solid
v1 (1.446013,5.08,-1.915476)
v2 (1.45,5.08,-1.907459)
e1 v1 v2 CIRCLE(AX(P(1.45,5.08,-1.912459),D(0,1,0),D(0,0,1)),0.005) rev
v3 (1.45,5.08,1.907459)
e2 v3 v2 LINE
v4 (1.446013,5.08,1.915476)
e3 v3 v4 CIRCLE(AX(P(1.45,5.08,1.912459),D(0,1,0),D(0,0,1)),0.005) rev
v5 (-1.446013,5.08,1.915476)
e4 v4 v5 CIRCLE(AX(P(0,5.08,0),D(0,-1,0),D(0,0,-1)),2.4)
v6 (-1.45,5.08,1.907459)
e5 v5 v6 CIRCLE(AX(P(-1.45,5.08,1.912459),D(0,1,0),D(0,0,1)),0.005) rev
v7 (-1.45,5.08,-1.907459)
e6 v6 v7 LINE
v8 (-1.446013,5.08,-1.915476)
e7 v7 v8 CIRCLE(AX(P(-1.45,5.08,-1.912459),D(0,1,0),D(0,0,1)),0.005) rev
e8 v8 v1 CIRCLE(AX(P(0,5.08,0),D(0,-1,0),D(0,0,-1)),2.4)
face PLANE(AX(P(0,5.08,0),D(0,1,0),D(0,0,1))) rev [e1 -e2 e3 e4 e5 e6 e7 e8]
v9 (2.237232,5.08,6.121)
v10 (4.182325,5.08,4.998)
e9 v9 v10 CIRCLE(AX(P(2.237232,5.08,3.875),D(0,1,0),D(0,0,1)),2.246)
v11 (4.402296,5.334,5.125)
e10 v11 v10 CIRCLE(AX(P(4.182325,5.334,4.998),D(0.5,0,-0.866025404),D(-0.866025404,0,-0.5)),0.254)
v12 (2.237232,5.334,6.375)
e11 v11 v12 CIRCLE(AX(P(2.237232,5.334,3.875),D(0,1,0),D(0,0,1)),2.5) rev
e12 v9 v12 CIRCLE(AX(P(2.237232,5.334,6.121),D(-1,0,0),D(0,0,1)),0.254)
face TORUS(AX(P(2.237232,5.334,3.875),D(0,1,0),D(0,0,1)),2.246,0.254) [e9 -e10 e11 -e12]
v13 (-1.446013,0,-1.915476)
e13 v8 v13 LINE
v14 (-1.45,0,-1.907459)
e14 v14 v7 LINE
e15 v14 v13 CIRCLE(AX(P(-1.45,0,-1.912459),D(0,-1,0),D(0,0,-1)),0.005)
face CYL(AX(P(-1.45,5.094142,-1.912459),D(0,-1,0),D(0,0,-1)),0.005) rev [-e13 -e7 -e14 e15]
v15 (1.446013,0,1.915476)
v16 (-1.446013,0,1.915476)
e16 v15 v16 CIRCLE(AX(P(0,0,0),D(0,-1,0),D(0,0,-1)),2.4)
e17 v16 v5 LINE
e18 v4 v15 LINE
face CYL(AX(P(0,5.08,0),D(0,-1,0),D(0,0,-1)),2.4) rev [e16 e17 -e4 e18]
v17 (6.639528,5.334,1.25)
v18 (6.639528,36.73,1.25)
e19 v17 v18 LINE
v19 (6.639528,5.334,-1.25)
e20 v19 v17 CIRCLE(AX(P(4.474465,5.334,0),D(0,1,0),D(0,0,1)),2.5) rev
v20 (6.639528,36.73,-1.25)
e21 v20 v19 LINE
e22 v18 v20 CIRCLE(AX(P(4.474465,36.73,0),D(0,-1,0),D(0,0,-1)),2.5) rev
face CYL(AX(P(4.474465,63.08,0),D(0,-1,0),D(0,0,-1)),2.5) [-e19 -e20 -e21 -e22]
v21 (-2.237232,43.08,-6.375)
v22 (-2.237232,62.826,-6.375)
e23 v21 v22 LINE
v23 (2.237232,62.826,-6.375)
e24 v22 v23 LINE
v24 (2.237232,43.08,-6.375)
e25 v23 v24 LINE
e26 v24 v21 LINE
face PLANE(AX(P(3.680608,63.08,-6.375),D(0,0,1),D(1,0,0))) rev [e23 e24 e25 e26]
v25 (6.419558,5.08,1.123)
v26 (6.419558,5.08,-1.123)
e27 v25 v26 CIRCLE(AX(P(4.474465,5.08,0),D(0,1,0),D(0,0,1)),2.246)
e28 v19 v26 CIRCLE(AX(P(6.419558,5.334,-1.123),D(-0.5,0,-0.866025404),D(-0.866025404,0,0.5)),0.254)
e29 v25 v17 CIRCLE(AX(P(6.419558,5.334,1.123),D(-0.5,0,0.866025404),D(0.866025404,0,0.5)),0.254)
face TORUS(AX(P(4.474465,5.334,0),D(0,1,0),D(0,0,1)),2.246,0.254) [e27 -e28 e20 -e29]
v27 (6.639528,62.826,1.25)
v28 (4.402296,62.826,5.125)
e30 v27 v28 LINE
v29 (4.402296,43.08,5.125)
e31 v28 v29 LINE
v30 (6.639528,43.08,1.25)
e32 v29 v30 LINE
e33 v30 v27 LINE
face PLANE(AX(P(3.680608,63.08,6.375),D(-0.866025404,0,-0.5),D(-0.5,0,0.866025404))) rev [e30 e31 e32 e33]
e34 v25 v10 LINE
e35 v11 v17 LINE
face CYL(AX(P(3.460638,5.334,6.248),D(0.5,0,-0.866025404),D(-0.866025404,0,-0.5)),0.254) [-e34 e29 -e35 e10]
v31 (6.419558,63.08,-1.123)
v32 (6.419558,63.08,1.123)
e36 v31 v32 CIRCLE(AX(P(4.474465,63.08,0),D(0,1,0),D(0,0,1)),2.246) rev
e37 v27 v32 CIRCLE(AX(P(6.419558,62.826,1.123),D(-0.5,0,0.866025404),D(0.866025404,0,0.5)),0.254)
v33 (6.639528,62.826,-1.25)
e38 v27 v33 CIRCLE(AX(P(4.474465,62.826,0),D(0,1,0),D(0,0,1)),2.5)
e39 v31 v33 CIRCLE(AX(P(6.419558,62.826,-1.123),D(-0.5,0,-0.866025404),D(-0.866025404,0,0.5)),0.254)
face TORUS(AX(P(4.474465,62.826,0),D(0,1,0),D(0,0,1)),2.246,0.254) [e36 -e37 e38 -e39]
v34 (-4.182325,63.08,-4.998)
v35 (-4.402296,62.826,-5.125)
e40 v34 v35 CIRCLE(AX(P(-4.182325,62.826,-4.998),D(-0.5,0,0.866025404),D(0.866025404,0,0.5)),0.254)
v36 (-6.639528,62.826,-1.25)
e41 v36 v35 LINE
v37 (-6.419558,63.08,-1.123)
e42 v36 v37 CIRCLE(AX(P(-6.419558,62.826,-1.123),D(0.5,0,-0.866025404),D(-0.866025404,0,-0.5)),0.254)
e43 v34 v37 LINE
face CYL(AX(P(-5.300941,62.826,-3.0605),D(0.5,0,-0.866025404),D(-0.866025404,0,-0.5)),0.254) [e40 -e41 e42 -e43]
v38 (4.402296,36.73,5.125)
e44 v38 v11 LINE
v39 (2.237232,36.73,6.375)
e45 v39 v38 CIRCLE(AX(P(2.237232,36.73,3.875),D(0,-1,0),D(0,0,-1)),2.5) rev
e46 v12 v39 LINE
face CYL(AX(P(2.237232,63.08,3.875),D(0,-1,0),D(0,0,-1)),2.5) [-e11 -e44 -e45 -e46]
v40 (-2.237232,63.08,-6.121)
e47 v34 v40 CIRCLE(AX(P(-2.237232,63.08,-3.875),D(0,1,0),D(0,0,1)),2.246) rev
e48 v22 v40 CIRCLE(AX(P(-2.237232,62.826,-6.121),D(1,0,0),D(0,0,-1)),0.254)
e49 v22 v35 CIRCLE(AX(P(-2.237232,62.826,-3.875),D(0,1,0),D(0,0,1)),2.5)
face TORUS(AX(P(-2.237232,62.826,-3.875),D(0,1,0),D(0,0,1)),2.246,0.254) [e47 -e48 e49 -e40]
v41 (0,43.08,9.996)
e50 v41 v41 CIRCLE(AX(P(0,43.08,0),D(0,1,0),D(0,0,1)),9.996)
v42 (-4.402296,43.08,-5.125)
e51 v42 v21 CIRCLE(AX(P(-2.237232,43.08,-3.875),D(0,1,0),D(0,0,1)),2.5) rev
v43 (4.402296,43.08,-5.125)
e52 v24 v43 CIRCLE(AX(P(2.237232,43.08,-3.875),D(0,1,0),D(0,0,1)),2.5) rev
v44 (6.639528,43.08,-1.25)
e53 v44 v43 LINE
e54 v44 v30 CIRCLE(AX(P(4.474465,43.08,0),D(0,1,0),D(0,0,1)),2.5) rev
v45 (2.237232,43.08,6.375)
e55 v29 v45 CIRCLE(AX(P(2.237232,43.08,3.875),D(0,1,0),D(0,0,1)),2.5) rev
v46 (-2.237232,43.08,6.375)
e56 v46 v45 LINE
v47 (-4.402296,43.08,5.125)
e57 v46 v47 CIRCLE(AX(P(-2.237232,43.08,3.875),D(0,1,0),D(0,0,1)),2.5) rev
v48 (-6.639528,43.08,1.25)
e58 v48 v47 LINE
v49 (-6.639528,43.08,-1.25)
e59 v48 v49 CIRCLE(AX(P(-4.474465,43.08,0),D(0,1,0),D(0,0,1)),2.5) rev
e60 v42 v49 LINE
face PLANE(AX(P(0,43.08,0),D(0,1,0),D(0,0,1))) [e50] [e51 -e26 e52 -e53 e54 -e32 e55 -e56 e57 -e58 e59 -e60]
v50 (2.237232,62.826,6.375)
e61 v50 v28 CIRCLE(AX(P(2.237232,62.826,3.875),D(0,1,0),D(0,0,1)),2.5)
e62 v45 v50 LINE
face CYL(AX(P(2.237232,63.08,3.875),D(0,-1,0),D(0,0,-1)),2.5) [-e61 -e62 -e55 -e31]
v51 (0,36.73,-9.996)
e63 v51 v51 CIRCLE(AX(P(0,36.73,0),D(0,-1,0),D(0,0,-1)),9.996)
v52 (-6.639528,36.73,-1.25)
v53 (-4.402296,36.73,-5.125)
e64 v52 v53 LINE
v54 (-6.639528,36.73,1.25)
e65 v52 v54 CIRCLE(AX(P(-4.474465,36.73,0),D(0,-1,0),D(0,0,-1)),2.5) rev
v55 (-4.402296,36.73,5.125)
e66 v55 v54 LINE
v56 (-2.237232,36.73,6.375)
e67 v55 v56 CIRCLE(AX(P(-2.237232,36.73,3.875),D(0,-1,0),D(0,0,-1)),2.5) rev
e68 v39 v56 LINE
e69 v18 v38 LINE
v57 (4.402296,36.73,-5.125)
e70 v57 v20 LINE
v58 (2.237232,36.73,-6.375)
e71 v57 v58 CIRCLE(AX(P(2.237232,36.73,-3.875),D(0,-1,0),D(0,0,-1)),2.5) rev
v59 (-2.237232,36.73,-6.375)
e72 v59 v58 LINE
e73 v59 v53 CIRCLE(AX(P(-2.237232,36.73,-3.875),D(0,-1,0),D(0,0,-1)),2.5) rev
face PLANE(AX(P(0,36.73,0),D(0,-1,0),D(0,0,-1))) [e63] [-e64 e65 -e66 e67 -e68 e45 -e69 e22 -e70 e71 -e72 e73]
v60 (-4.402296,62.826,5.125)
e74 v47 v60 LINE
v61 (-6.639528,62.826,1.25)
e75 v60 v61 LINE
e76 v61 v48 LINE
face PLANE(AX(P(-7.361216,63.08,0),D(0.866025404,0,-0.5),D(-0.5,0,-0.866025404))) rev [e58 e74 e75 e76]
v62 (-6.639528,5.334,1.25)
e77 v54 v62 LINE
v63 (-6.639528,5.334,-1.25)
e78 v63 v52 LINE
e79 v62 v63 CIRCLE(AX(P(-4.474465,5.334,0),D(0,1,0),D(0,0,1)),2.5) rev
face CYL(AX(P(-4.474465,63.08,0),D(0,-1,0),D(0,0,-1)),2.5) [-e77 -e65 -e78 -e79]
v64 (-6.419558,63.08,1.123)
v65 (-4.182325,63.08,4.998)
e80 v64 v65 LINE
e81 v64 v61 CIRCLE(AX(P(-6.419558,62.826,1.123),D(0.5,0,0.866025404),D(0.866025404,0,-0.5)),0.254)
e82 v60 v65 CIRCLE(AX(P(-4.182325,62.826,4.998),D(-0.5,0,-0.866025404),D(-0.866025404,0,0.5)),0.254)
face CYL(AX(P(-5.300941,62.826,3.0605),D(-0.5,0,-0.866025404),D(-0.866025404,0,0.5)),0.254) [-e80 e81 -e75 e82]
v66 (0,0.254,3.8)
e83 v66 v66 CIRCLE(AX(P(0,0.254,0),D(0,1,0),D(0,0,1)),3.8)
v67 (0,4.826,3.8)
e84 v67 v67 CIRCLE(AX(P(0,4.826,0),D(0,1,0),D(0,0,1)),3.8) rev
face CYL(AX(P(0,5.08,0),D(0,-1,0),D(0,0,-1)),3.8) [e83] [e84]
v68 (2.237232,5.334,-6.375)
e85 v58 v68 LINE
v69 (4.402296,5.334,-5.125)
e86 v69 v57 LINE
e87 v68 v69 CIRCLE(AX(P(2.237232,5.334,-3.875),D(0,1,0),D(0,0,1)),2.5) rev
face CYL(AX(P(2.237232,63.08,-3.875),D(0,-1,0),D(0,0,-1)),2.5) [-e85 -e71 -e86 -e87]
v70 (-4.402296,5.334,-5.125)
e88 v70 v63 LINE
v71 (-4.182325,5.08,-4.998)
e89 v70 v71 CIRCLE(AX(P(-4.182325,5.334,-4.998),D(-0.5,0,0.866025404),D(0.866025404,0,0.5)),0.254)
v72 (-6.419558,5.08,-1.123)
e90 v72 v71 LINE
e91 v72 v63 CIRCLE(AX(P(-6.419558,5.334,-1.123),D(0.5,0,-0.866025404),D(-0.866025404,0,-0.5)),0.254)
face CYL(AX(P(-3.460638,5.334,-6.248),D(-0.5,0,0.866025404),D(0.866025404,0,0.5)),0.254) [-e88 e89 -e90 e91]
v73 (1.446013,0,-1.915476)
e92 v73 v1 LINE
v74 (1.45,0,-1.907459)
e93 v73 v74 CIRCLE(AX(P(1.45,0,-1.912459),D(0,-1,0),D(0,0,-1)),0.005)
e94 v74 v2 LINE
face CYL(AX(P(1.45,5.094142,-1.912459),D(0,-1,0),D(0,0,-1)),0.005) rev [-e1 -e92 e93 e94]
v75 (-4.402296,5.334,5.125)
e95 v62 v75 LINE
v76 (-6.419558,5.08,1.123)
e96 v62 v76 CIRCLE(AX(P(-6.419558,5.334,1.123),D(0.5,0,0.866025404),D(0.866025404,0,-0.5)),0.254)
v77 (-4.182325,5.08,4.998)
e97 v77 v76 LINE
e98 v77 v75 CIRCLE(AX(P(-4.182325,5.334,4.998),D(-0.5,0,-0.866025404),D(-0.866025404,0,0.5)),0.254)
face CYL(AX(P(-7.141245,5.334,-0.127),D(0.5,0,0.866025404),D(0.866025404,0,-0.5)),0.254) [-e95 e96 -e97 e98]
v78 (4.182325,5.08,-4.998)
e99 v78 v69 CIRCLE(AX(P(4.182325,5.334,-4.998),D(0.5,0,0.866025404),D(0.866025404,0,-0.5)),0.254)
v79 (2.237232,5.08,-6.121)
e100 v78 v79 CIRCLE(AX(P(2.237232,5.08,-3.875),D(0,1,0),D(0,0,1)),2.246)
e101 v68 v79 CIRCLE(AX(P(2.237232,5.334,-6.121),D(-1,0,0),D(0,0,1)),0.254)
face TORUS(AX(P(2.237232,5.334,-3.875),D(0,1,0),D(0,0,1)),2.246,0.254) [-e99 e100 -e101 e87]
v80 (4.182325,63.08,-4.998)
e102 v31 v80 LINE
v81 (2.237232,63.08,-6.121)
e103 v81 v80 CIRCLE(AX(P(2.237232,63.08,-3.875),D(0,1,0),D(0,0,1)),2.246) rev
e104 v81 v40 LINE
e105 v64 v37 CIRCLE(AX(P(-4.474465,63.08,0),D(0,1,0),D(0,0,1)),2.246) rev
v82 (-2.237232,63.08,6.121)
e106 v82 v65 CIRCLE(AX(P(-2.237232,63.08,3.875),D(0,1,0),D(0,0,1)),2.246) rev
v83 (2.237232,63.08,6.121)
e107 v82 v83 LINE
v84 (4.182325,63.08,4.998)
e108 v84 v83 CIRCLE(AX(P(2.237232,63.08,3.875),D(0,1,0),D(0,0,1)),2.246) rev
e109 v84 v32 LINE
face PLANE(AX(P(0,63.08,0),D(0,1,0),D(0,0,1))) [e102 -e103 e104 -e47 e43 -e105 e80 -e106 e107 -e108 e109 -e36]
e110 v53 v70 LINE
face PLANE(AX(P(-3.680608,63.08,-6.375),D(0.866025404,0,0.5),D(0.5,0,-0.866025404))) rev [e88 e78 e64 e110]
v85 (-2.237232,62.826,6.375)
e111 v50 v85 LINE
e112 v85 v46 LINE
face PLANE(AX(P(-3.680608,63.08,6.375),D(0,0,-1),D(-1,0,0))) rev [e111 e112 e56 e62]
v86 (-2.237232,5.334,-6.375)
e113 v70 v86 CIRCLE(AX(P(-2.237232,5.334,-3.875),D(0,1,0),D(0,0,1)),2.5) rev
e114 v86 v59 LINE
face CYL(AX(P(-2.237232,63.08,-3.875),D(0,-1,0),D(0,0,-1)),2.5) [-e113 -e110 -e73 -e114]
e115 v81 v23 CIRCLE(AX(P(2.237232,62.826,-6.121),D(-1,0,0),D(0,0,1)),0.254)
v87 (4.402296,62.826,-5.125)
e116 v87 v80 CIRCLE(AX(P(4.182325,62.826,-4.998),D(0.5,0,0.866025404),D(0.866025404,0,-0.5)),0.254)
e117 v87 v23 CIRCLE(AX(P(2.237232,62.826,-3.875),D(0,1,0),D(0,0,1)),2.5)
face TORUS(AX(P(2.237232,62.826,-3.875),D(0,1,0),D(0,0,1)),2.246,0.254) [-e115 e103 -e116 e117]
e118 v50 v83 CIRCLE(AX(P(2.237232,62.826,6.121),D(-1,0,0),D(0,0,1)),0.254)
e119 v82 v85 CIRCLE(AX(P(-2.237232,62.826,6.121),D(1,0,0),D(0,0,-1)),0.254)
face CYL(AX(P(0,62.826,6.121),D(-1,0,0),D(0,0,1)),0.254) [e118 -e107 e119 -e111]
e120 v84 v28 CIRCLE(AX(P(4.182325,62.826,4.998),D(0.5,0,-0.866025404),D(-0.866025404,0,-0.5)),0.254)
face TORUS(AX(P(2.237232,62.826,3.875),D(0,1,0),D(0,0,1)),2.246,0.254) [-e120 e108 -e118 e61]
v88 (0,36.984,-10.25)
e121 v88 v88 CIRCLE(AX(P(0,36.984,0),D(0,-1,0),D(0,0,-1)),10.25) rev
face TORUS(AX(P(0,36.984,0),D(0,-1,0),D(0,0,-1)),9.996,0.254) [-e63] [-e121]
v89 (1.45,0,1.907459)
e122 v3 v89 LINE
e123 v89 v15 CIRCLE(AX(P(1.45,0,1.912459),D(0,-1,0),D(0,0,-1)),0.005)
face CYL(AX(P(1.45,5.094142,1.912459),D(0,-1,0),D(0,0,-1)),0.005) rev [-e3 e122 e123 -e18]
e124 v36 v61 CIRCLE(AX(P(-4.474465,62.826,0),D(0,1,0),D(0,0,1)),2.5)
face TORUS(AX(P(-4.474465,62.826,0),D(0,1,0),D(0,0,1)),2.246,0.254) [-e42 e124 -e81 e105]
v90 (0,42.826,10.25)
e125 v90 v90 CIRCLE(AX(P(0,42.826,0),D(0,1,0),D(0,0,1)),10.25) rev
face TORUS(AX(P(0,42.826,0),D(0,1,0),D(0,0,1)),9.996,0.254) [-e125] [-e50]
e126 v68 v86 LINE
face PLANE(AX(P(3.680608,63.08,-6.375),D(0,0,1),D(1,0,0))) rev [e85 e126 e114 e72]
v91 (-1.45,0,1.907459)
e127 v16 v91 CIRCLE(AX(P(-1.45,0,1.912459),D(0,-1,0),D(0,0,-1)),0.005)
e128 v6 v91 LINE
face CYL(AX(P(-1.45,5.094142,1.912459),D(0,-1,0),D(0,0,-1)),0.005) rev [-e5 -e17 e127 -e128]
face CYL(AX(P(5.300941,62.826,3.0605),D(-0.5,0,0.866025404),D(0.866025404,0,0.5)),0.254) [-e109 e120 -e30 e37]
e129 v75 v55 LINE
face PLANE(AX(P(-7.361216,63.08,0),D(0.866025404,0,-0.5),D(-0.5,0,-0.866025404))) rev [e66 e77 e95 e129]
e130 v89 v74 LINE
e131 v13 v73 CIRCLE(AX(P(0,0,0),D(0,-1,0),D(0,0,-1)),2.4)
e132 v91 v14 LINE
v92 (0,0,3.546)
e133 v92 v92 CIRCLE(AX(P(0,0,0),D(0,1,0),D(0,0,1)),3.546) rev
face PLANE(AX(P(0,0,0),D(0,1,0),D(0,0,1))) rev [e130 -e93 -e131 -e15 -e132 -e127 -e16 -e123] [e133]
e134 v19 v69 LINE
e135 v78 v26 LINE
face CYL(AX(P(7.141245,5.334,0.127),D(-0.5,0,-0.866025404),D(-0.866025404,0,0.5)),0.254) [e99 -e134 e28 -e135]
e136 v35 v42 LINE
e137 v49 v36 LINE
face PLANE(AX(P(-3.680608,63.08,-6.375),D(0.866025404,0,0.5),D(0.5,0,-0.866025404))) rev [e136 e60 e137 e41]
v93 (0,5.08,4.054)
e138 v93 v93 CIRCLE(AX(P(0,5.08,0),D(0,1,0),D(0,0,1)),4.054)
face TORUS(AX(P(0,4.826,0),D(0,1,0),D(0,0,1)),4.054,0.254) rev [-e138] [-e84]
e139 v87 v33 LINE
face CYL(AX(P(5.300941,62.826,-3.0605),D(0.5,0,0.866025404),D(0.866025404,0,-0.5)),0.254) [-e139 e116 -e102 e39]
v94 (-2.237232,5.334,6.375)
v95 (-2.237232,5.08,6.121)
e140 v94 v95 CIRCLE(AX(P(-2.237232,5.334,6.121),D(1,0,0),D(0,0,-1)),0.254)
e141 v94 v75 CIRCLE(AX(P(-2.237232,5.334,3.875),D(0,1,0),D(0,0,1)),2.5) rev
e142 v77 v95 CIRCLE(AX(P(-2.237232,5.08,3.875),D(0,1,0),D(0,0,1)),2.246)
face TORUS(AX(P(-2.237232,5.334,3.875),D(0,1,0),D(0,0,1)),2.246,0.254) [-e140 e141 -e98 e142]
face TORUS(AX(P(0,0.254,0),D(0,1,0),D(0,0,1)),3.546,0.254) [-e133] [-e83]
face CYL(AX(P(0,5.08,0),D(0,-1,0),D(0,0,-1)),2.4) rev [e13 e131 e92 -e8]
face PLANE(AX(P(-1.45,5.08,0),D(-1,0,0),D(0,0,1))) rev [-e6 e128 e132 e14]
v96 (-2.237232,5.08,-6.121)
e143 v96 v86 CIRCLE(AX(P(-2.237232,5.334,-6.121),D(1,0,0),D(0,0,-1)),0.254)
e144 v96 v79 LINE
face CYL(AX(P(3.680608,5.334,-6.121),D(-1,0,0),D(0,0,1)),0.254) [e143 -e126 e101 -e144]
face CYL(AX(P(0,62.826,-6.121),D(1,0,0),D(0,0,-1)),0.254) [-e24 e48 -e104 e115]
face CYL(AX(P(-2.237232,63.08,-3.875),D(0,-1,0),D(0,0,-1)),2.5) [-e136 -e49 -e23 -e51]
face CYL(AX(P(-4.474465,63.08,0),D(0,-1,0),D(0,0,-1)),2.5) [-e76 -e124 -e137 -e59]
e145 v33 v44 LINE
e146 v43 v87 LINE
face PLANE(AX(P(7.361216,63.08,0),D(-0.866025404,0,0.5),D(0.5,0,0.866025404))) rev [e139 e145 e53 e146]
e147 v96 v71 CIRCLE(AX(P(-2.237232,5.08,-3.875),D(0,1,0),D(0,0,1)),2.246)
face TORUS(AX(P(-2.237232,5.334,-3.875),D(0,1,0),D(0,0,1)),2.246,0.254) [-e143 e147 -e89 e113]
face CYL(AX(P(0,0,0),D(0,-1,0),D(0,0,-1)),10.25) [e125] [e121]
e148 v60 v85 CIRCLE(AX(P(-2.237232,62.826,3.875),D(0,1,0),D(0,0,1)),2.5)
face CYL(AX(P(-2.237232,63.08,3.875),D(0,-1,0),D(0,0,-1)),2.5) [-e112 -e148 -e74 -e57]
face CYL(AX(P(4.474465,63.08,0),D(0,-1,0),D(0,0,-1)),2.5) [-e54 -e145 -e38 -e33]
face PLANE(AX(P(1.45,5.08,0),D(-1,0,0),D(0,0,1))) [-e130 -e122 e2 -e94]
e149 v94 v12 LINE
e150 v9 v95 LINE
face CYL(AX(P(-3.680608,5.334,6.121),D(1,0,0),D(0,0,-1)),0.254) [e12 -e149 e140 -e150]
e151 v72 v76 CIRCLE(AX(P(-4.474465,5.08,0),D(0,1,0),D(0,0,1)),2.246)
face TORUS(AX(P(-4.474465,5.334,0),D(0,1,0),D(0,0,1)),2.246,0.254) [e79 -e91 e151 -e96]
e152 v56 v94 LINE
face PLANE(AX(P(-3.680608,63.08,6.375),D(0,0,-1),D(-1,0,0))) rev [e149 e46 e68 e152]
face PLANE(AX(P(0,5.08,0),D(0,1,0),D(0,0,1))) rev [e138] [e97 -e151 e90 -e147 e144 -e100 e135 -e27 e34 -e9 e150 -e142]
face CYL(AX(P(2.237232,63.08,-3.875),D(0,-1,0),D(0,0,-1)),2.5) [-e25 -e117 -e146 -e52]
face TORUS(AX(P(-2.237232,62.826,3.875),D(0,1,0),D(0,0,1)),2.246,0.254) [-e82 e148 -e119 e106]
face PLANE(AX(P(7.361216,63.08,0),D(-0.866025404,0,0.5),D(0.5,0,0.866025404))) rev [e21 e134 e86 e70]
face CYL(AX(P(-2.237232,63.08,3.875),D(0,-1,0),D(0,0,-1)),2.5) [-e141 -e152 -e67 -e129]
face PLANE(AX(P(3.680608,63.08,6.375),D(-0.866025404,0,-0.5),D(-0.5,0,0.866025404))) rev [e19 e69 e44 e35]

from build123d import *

# Parameters (mm, degrees)
SKETCH1_R             = 3.8
MOTORMOUNTSHELL_DEPTH = 5.08
MOTORMOUNT_DEPTH      = 5.08
SHAFT_DEPTH           = 58
SKETCH4_W             = 10.25
SKETCH4_H             = 6.35
SKETCH5_R             = 0.005
MOUNTROUND_DEPTH      = 5.08
FILLET1_R             = 0.254
FILLET2_R             = 2.5


with BuildPart() as part:
    # Sketch1 → MotorMountShell (new body)
    with BuildSketch(Plane(origin=(0, 0, 0), x_dir=(1, 0, 0), z_dir=(0, 1, 0))):
        with Locations(Location((0, 0, 0), (0, 0, 270))):
            Circle(SKETCH1_R)
    extrude(amount=MOTORMOUNTSHELL_DEPTH)

    # Sketch2 → MotorMount (cut)
    with BuildSketch(Plane.XZ):
        with BuildLine():
            ThreePointArc((1.45, 1.91245915), (0, 2.4), (-1.45, 1.91245915))
            Line((-1.45, 1.91245915), (-1.45, -1.91245915))
            ThreePointArc((-1.45, -1.91245915), (0, -2.4), (1.45, -1.91245915))
            Line((1.45, -1.91245915), (1.45, 1.91245915))
        make_face()
    extrude(amount=-MOTORMOUNT_DEPTH, mode=Mode.SUBTRACT)

    # Sketch3 → Shaft (add)
    with BuildSketch(Plane(origin=(0, 5.08, 0), x_dir=(1, 0, 0), z_dir=(0, 1, 0))):
        Polygon((3.680607966, -6.375), (7.361215932, 0), (3.680607966, 6.375), (-3.680607966, 6.375), (-7.361215932, 0), (-3.680607966, -6.375), align=None)
    extrude(amount=SHAFT_DEPTH)

    # Sketch4 → Collar (revolve)
    with BuildSketch(Plane.XY, mode=Mode.PRIVATE) as collar_sk:
        with Locations((5.125, 39.905)):
            Rectangle(SKETCH4_W, SKETCH4_H)
    revolve(collar_sk.sketch.rotate(Axis((0, 0, 0), (0, 1, 0)), 90), axis=Axis((0, 0, 0), (0, 1, 0)))

    # Sketch5 → MountRound (cut)
    with BuildSketch(Plane.XZ):
        with Locations((-1.45, 1.91245915)):
            Circle(SKETCH5_R)
        with Locations((1.45, 1.91245915)):
            Circle(SKETCH5_R)
        with Locations((-1.45, -1.91245915)):
            Circle(SKETCH5_R)
        with Locations((1.45, -1.91245915)):
            Circle(SKETCH5_R)
    extrude(amount=-MOUNTROUND_DEPTH, mode=Mode.SUBTRACT)

    # Fillet1
    fillet1_edges = [part.edges().sort_by_distance(p)[0] for p in [
        (0, 0, -3.8),
        (0, 5.08, 6.375),
        (5.520911949, 5.08, 3.1875),
        (5.520911949, 5.08, -3.1875),
        (0, 5.08, -6.375),
        (-5.520911949, 5.08, -3.1875),
        (-5.520911949, 5.08, 3.1875),
        (0, 63.08, 6.375),
        (5.520911949, 63.08, 3.1875),
        (5.520911949, 63.08, -3.1875),
        (0, 63.08, -6.375),
        (-5.520911949, 63.08, -3.1875),
        (-5.520911949, 63.08, 3.1875),
        (0, 5.08, -3.8),
        (0, 36.73, 10.25),
        (0, 43.08, 10.25),
    ]]
    fillet(fillet1_edges, radius=FILLET1_R)

    # Fillet2
    # the kernel refuses this fillet: 2.5 mm, written as the material it takes off along each edge
    with BuildSketch(Plane(origin=(-4.474464586, 5.08, 0), x_dir=(-0.8660254037844387, 0, 0.49999999999999994), z_dir=(0.49999999999999994, 0, 0.8660254037844387))) as fillet2_piece_1:
        with BuildLine():
            CenterArc((2.246, -0.254), 0.254, 0, 90)
            Line((2.5, -0.254), (2.5, 0))
            Line((2.5, 0), (2.246, 0))
        make_face()
    revolve(axis=Axis((-4.474464586, 5.08, 0), (0, -1, 0)), revolution_arc=60, mode=Mode.SUBTRACT)
    with BuildSketch(Plane(origin=(-2.237232293, 5.08, -3.875), x_dir=(-0.8660254037844387, 0, -0.5000000000000001), z_dir=(-0.5000000000000001, 0, 0.8660254037844387))) as fillet2_piece_2:
        with BuildLine():
            CenterArc((2.246, -0.254), 0.254, 0, 90)
            Line((2.5, -0.254), (2.5, 0))
            Line((2.5, 0), (2.246, 0))
        make_face()
    revolve(axis=Axis((-2.237232293, 5.08, -3.875), (0, -1, 0)), revolution_arc=60, mode=Mode.SUBTRACT)
    with BuildSketch(Plane(origin=(-2.237232293, 5.08, 3.875), x_dir=(0, 0, 1), z_dir=(1, 0, 0))) as fillet2_piece_3:
        with BuildLine():
            CenterArc((2.246, -0.254), 0.254, 0, 90)
            Line((2.5, -0.254), (2.5, 0))
            Line((2.5, 0), (2.246, 0))
        make_face()
    revolve(axis=Axis((-2.237232293, 5.08, 3.875), (0, -1, 0)), revolution_arc=60, mode=Mode.SUBTRACT)
    with BuildSketch(Plane(origin=(2.237232293, 5.08, -3.875), x_dir=(0, 0, -1), z_dir=(-1, 0, 0))) as fillet2_piece_4:
        with BuildLine():
            CenterArc((2.246, -0.254), 0.254, 0, 90)
            Line((2.5, -0.254), (2.5, 0))
            Line((2.5, 0), (2.246, 0))
        make_face()
    revolve(axis=Axis((2.237232293, 5.08, -3.875), (0, -1, 0)), revolution_arc=60, mode=Mode.SUBTRACT)
    with BuildSketch(Plane(origin=(2.237232293, 5.08, 3.875), x_dir=(0.8660254037844388, 0, 0.4999999999999999), z_dir=(0.4999999999999999, 0, -0.8660254037844388))) as fillet2_piece_5:
        with BuildLine():
            CenterArc((2.246, -0.254), 0.254, 0, 90)
            Line((2.5, -0.254), (2.5, 0))
            Line((2.5, 0), (2.246, 0))
        make_face()
    revolve(axis=Axis((2.237232293, 5.08, 3.875), (0, -1, 0)), revolution_arc=60, mode=Mode.SUBTRACT)
    with BuildSketch(Plane(origin=(4.474464586, 5.08, 0), x_dir=(0.8660254037844387, 0, -0.49999999999999994), z_dir=(-0.49999999999999994, 0, -0.8660254037844387))) as fillet2_piece_6:
        with BuildLine():
            CenterArc((2.246, -0.254), 0.254, 0, 90)
            Line((2.5, -0.254), (2.5, 0))
            Line((2.5, 0), (2.246, 0))
        make_face()
    revolve(axis=Axis((4.474464586, 5.08, 0), (0, -1, 0)), revolution_arc=60, mode=Mode.SUBTRACT)
    with BuildSketch(Plane(origin=(2.237232293, 63.08, -3.875), x_dir=(0.8660254037844387, 0, -0.49999999999999994), z_dir=(0.49999999999999994, 0, 0.8660254037844387))) as fillet2_piece_7:
        with BuildLine():
            CenterArc((2.246, -0.254), 0.254, 0, 90)
            Line((2.5, -0.254), (2.5, 0))
            Line((2.5, 0), (2.246, 0))
        make_face()
    revolve(axis=Axis((2.237232293, 63.08, -3.875), (0, 1, 0)), revolution_arc=60, mode=Mode.SUBTRACT)
    with BuildSketch(Plane(origin=(4.474464586, 63.08, 0), x_dir=(0.8660254037844388, 0, 0.4999999999999999), z_dir=(-0.4999999999999999, 0, 0.8660254037844388))) as fillet2_piece_8:
        with BuildLine():
            CenterArc((2.246, -0.254), 0.254, 0, 90)
            Line((2.5, -0.254), (2.5, 0))
            Line((2.5, 0), (2.246, 0))
        make_face()
    revolve(axis=Axis((4.474464586, 63.08, 0), (0, 1, 0)), revolution_arc=60, mode=Mode.SUBTRACT)
    with BuildSketch(Plane(origin=(-2.237232293, 63.08, -3.875), x_dir=(0, 0, -1), z_dir=(1, 0, 0))) as fillet2_piece_9:
        with BuildLine():
            CenterArc((2.246, -0.254), 0.254, 0, 90)
            Line((2.5, -0.254), (2.5, 0))
            Line((2.5, 0), (2.246, 0))
        make_face()
    revolve(axis=Axis((-2.237232293, 63.08, -3.875), (0, 1, 0)), revolution_arc=60, mode=Mode.SUBTRACT)
    with BuildSketch(Plane(origin=(2.237232293, 63.08, 3.875), x_dir=(0, 0, 1), z_dir=(-1, 0, 0))) as fillet2_piece_10:
        with BuildLine():
            CenterArc((2.246, -0.254), 0.254, 0, 90)
            Line((2.5, -0.254), (2.5, 0))
            Line((2.5, 0), (2.246, 0))
        make_face()
    revolve(axis=Axis((2.237232293, 63.08, 3.875), (0, 1, 0)), revolution_arc=60, mode=Mode.SUBTRACT)
    with BuildSketch(Plane(origin=(-4.474464586, 63.08, 0), x_dir=(-0.8660254037844387, 0, -0.5000000000000001), z_dir=(0.5000000000000001, 0, -0.8660254037844387))) as fillet2_piece_11:
        with BuildLine():
            CenterArc((2.246, -0.254), 0.254, 0, 90)
            Line((2.5, -0.254), (2.5, 0))
            Line((2.5, 0), (2.246, 0))
        make_face()
    revolve(axis=Axis((-4.474464586, 63.08, 0), (0, 1, 0)), revolution_arc=60, mode=Mode.SUBTRACT)
    with BuildSketch(Plane(origin=(-2.237232293, 63.08, 3.875), x_dir=(-0.8660254037844387, 0, 0.49999999999999994), z_dir=(-0.49999999999999994, 0, -0.8660254037844387))) as fillet2_piece_12:
        with BuildLine():
            CenterArc((2.246, -0.254), 0.254, 0, 90)
            Line((2.5, -0.254), (2.5, 0))
            Line((2.5, 0), (2.246, 0))
        make_face()
    revolve(axis=Axis((-2.237232293, 63.08, 3.875), (0, 1, 0)), revolution_arc=60, mode=Mode.SUBTRACT)
    with BuildSketch(Plane(origin=(-7.361215932, 43.08, 0), x_dir=(0.5000000000000007, 0, -0.8660254037844383), z_dir=(0, 1, 0)), Plane(origin=(-3.680607966, 43.08, 6.375), x_dir=(-0.4999999999999998, 0, -0.8660254037844387), z_dir=(0, 1, 0)), Plane(origin=(-3.680607966, 43.08, -6.375), x_dir=(1, 0, 0), z_dir=(0, 1, 0)), Plane(origin=(3.680607966, 43.08, -6.375), x_dir=(0.4999999999999998, 0, 0.8660254037844387), z_dir=(0, 1, 0)), Plane(origin=(7.361215932, 43.08, 0), x_dir=(-0.49999999999999933, 0, 0.8660254037844389), z_dir=(0, 1, 0))) as fillet2_piece_13:
        with BuildLine():
            CenterArc((FILLET2_R * 0.57735026919, -FILLET2_R), FILLET2_R, 90, 60)
            Line((-FILLET2_R * 0.288675134595, -FILLET2_R * 0.5), (0, 0))
            Line((0, 0), (FILLET2_R * 0.57735026919, 0))
        make_face()
    extrude(amount=20, mode=Mode.SUBTRACT)
    with BuildSketch(Plane(origin=(3.680607966, 43.08, 6.375), x_dir=(0.49999999999999956, 0, -0.8660254037844389), z_dir=(0, 1, 0))) as fillet2_piece_14:
        with BuildLine():
            CenterArc((FILLET2_R * 0.57735026919, FILLET2_R), FILLET2_R, 210, 60)
            Line((-FILLET2_R * 0.288675134595, FILLET2_R * 0.5), (0, 0))
            Line((0, 0), (FILLET2_R * 0.57735026919, 0))
        make_face()
    extrude(amount=20, mode=Mode.SUBTRACT)
    with BuildSketch(Plane(origin=(-3.680607966, 5.08, 6.375), x_dir=(1, 0, 0), z_dir=(0, 1, 0)), Plane(origin=(-7.361215932, 5.08, 0), x_dir=(0.4999999999999998, 0, 0.8660254037844387), z_dir=(0, 1, 0)), Plane(origin=(3.680607966, 5.08, 6.375), x_dir=(0.49999999999999956, 0, -0.8660254037844389), z_dir=(0, 1, 0))) as fillet2_piece_15:
        with BuildLine():
            CenterArc((FILLET2_R * 0.57735026919, FILLET2_R), FILLET2_R, 210, 60)
            Line((-FILLET2_R * 0.288675134595, FILLET2_R * 0.5), (0, 0))
            Line((0, 0), (FILLET2_R * 0.57735026919, 0))
        make_face()
    extrude(amount=31.65, mode=Mode.SUBTRACT)
    with BuildSketch(Plane(origin=(-3.680607966, 5.08, -6.375), x_dir=(1, 0, 0), z_dir=(0, 1, 0)), Plane(origin=(3.680607966, 5.08, -6.375), x_dir=(0.4999999999999998, 0, 0.8660254037844387), z_dir=(0, 1, 0)), Plane(origin=(7.361215932, 5.08, 0), x_dir=(-0.5000000000000003, 0, 0.8660254037844384), z_dir=(0, 1, 0))) as fillet2_piece_16:
        with BuildLine():
            CenterArc((FILLET2_R * 0.57735026919, -FILLET2_R), FILLET2_R, 90, 60)
            Line((-FILLET2_R * 0.288675134595, -FILLET2_R * 0.5), (0, 0))
            Line((0, 0), (FILLET2_R * 0.57735026919, 0))
        make_face()
    extrude(amount=31.65, mode=Mode.SUBTRACT)


solid = part.part
